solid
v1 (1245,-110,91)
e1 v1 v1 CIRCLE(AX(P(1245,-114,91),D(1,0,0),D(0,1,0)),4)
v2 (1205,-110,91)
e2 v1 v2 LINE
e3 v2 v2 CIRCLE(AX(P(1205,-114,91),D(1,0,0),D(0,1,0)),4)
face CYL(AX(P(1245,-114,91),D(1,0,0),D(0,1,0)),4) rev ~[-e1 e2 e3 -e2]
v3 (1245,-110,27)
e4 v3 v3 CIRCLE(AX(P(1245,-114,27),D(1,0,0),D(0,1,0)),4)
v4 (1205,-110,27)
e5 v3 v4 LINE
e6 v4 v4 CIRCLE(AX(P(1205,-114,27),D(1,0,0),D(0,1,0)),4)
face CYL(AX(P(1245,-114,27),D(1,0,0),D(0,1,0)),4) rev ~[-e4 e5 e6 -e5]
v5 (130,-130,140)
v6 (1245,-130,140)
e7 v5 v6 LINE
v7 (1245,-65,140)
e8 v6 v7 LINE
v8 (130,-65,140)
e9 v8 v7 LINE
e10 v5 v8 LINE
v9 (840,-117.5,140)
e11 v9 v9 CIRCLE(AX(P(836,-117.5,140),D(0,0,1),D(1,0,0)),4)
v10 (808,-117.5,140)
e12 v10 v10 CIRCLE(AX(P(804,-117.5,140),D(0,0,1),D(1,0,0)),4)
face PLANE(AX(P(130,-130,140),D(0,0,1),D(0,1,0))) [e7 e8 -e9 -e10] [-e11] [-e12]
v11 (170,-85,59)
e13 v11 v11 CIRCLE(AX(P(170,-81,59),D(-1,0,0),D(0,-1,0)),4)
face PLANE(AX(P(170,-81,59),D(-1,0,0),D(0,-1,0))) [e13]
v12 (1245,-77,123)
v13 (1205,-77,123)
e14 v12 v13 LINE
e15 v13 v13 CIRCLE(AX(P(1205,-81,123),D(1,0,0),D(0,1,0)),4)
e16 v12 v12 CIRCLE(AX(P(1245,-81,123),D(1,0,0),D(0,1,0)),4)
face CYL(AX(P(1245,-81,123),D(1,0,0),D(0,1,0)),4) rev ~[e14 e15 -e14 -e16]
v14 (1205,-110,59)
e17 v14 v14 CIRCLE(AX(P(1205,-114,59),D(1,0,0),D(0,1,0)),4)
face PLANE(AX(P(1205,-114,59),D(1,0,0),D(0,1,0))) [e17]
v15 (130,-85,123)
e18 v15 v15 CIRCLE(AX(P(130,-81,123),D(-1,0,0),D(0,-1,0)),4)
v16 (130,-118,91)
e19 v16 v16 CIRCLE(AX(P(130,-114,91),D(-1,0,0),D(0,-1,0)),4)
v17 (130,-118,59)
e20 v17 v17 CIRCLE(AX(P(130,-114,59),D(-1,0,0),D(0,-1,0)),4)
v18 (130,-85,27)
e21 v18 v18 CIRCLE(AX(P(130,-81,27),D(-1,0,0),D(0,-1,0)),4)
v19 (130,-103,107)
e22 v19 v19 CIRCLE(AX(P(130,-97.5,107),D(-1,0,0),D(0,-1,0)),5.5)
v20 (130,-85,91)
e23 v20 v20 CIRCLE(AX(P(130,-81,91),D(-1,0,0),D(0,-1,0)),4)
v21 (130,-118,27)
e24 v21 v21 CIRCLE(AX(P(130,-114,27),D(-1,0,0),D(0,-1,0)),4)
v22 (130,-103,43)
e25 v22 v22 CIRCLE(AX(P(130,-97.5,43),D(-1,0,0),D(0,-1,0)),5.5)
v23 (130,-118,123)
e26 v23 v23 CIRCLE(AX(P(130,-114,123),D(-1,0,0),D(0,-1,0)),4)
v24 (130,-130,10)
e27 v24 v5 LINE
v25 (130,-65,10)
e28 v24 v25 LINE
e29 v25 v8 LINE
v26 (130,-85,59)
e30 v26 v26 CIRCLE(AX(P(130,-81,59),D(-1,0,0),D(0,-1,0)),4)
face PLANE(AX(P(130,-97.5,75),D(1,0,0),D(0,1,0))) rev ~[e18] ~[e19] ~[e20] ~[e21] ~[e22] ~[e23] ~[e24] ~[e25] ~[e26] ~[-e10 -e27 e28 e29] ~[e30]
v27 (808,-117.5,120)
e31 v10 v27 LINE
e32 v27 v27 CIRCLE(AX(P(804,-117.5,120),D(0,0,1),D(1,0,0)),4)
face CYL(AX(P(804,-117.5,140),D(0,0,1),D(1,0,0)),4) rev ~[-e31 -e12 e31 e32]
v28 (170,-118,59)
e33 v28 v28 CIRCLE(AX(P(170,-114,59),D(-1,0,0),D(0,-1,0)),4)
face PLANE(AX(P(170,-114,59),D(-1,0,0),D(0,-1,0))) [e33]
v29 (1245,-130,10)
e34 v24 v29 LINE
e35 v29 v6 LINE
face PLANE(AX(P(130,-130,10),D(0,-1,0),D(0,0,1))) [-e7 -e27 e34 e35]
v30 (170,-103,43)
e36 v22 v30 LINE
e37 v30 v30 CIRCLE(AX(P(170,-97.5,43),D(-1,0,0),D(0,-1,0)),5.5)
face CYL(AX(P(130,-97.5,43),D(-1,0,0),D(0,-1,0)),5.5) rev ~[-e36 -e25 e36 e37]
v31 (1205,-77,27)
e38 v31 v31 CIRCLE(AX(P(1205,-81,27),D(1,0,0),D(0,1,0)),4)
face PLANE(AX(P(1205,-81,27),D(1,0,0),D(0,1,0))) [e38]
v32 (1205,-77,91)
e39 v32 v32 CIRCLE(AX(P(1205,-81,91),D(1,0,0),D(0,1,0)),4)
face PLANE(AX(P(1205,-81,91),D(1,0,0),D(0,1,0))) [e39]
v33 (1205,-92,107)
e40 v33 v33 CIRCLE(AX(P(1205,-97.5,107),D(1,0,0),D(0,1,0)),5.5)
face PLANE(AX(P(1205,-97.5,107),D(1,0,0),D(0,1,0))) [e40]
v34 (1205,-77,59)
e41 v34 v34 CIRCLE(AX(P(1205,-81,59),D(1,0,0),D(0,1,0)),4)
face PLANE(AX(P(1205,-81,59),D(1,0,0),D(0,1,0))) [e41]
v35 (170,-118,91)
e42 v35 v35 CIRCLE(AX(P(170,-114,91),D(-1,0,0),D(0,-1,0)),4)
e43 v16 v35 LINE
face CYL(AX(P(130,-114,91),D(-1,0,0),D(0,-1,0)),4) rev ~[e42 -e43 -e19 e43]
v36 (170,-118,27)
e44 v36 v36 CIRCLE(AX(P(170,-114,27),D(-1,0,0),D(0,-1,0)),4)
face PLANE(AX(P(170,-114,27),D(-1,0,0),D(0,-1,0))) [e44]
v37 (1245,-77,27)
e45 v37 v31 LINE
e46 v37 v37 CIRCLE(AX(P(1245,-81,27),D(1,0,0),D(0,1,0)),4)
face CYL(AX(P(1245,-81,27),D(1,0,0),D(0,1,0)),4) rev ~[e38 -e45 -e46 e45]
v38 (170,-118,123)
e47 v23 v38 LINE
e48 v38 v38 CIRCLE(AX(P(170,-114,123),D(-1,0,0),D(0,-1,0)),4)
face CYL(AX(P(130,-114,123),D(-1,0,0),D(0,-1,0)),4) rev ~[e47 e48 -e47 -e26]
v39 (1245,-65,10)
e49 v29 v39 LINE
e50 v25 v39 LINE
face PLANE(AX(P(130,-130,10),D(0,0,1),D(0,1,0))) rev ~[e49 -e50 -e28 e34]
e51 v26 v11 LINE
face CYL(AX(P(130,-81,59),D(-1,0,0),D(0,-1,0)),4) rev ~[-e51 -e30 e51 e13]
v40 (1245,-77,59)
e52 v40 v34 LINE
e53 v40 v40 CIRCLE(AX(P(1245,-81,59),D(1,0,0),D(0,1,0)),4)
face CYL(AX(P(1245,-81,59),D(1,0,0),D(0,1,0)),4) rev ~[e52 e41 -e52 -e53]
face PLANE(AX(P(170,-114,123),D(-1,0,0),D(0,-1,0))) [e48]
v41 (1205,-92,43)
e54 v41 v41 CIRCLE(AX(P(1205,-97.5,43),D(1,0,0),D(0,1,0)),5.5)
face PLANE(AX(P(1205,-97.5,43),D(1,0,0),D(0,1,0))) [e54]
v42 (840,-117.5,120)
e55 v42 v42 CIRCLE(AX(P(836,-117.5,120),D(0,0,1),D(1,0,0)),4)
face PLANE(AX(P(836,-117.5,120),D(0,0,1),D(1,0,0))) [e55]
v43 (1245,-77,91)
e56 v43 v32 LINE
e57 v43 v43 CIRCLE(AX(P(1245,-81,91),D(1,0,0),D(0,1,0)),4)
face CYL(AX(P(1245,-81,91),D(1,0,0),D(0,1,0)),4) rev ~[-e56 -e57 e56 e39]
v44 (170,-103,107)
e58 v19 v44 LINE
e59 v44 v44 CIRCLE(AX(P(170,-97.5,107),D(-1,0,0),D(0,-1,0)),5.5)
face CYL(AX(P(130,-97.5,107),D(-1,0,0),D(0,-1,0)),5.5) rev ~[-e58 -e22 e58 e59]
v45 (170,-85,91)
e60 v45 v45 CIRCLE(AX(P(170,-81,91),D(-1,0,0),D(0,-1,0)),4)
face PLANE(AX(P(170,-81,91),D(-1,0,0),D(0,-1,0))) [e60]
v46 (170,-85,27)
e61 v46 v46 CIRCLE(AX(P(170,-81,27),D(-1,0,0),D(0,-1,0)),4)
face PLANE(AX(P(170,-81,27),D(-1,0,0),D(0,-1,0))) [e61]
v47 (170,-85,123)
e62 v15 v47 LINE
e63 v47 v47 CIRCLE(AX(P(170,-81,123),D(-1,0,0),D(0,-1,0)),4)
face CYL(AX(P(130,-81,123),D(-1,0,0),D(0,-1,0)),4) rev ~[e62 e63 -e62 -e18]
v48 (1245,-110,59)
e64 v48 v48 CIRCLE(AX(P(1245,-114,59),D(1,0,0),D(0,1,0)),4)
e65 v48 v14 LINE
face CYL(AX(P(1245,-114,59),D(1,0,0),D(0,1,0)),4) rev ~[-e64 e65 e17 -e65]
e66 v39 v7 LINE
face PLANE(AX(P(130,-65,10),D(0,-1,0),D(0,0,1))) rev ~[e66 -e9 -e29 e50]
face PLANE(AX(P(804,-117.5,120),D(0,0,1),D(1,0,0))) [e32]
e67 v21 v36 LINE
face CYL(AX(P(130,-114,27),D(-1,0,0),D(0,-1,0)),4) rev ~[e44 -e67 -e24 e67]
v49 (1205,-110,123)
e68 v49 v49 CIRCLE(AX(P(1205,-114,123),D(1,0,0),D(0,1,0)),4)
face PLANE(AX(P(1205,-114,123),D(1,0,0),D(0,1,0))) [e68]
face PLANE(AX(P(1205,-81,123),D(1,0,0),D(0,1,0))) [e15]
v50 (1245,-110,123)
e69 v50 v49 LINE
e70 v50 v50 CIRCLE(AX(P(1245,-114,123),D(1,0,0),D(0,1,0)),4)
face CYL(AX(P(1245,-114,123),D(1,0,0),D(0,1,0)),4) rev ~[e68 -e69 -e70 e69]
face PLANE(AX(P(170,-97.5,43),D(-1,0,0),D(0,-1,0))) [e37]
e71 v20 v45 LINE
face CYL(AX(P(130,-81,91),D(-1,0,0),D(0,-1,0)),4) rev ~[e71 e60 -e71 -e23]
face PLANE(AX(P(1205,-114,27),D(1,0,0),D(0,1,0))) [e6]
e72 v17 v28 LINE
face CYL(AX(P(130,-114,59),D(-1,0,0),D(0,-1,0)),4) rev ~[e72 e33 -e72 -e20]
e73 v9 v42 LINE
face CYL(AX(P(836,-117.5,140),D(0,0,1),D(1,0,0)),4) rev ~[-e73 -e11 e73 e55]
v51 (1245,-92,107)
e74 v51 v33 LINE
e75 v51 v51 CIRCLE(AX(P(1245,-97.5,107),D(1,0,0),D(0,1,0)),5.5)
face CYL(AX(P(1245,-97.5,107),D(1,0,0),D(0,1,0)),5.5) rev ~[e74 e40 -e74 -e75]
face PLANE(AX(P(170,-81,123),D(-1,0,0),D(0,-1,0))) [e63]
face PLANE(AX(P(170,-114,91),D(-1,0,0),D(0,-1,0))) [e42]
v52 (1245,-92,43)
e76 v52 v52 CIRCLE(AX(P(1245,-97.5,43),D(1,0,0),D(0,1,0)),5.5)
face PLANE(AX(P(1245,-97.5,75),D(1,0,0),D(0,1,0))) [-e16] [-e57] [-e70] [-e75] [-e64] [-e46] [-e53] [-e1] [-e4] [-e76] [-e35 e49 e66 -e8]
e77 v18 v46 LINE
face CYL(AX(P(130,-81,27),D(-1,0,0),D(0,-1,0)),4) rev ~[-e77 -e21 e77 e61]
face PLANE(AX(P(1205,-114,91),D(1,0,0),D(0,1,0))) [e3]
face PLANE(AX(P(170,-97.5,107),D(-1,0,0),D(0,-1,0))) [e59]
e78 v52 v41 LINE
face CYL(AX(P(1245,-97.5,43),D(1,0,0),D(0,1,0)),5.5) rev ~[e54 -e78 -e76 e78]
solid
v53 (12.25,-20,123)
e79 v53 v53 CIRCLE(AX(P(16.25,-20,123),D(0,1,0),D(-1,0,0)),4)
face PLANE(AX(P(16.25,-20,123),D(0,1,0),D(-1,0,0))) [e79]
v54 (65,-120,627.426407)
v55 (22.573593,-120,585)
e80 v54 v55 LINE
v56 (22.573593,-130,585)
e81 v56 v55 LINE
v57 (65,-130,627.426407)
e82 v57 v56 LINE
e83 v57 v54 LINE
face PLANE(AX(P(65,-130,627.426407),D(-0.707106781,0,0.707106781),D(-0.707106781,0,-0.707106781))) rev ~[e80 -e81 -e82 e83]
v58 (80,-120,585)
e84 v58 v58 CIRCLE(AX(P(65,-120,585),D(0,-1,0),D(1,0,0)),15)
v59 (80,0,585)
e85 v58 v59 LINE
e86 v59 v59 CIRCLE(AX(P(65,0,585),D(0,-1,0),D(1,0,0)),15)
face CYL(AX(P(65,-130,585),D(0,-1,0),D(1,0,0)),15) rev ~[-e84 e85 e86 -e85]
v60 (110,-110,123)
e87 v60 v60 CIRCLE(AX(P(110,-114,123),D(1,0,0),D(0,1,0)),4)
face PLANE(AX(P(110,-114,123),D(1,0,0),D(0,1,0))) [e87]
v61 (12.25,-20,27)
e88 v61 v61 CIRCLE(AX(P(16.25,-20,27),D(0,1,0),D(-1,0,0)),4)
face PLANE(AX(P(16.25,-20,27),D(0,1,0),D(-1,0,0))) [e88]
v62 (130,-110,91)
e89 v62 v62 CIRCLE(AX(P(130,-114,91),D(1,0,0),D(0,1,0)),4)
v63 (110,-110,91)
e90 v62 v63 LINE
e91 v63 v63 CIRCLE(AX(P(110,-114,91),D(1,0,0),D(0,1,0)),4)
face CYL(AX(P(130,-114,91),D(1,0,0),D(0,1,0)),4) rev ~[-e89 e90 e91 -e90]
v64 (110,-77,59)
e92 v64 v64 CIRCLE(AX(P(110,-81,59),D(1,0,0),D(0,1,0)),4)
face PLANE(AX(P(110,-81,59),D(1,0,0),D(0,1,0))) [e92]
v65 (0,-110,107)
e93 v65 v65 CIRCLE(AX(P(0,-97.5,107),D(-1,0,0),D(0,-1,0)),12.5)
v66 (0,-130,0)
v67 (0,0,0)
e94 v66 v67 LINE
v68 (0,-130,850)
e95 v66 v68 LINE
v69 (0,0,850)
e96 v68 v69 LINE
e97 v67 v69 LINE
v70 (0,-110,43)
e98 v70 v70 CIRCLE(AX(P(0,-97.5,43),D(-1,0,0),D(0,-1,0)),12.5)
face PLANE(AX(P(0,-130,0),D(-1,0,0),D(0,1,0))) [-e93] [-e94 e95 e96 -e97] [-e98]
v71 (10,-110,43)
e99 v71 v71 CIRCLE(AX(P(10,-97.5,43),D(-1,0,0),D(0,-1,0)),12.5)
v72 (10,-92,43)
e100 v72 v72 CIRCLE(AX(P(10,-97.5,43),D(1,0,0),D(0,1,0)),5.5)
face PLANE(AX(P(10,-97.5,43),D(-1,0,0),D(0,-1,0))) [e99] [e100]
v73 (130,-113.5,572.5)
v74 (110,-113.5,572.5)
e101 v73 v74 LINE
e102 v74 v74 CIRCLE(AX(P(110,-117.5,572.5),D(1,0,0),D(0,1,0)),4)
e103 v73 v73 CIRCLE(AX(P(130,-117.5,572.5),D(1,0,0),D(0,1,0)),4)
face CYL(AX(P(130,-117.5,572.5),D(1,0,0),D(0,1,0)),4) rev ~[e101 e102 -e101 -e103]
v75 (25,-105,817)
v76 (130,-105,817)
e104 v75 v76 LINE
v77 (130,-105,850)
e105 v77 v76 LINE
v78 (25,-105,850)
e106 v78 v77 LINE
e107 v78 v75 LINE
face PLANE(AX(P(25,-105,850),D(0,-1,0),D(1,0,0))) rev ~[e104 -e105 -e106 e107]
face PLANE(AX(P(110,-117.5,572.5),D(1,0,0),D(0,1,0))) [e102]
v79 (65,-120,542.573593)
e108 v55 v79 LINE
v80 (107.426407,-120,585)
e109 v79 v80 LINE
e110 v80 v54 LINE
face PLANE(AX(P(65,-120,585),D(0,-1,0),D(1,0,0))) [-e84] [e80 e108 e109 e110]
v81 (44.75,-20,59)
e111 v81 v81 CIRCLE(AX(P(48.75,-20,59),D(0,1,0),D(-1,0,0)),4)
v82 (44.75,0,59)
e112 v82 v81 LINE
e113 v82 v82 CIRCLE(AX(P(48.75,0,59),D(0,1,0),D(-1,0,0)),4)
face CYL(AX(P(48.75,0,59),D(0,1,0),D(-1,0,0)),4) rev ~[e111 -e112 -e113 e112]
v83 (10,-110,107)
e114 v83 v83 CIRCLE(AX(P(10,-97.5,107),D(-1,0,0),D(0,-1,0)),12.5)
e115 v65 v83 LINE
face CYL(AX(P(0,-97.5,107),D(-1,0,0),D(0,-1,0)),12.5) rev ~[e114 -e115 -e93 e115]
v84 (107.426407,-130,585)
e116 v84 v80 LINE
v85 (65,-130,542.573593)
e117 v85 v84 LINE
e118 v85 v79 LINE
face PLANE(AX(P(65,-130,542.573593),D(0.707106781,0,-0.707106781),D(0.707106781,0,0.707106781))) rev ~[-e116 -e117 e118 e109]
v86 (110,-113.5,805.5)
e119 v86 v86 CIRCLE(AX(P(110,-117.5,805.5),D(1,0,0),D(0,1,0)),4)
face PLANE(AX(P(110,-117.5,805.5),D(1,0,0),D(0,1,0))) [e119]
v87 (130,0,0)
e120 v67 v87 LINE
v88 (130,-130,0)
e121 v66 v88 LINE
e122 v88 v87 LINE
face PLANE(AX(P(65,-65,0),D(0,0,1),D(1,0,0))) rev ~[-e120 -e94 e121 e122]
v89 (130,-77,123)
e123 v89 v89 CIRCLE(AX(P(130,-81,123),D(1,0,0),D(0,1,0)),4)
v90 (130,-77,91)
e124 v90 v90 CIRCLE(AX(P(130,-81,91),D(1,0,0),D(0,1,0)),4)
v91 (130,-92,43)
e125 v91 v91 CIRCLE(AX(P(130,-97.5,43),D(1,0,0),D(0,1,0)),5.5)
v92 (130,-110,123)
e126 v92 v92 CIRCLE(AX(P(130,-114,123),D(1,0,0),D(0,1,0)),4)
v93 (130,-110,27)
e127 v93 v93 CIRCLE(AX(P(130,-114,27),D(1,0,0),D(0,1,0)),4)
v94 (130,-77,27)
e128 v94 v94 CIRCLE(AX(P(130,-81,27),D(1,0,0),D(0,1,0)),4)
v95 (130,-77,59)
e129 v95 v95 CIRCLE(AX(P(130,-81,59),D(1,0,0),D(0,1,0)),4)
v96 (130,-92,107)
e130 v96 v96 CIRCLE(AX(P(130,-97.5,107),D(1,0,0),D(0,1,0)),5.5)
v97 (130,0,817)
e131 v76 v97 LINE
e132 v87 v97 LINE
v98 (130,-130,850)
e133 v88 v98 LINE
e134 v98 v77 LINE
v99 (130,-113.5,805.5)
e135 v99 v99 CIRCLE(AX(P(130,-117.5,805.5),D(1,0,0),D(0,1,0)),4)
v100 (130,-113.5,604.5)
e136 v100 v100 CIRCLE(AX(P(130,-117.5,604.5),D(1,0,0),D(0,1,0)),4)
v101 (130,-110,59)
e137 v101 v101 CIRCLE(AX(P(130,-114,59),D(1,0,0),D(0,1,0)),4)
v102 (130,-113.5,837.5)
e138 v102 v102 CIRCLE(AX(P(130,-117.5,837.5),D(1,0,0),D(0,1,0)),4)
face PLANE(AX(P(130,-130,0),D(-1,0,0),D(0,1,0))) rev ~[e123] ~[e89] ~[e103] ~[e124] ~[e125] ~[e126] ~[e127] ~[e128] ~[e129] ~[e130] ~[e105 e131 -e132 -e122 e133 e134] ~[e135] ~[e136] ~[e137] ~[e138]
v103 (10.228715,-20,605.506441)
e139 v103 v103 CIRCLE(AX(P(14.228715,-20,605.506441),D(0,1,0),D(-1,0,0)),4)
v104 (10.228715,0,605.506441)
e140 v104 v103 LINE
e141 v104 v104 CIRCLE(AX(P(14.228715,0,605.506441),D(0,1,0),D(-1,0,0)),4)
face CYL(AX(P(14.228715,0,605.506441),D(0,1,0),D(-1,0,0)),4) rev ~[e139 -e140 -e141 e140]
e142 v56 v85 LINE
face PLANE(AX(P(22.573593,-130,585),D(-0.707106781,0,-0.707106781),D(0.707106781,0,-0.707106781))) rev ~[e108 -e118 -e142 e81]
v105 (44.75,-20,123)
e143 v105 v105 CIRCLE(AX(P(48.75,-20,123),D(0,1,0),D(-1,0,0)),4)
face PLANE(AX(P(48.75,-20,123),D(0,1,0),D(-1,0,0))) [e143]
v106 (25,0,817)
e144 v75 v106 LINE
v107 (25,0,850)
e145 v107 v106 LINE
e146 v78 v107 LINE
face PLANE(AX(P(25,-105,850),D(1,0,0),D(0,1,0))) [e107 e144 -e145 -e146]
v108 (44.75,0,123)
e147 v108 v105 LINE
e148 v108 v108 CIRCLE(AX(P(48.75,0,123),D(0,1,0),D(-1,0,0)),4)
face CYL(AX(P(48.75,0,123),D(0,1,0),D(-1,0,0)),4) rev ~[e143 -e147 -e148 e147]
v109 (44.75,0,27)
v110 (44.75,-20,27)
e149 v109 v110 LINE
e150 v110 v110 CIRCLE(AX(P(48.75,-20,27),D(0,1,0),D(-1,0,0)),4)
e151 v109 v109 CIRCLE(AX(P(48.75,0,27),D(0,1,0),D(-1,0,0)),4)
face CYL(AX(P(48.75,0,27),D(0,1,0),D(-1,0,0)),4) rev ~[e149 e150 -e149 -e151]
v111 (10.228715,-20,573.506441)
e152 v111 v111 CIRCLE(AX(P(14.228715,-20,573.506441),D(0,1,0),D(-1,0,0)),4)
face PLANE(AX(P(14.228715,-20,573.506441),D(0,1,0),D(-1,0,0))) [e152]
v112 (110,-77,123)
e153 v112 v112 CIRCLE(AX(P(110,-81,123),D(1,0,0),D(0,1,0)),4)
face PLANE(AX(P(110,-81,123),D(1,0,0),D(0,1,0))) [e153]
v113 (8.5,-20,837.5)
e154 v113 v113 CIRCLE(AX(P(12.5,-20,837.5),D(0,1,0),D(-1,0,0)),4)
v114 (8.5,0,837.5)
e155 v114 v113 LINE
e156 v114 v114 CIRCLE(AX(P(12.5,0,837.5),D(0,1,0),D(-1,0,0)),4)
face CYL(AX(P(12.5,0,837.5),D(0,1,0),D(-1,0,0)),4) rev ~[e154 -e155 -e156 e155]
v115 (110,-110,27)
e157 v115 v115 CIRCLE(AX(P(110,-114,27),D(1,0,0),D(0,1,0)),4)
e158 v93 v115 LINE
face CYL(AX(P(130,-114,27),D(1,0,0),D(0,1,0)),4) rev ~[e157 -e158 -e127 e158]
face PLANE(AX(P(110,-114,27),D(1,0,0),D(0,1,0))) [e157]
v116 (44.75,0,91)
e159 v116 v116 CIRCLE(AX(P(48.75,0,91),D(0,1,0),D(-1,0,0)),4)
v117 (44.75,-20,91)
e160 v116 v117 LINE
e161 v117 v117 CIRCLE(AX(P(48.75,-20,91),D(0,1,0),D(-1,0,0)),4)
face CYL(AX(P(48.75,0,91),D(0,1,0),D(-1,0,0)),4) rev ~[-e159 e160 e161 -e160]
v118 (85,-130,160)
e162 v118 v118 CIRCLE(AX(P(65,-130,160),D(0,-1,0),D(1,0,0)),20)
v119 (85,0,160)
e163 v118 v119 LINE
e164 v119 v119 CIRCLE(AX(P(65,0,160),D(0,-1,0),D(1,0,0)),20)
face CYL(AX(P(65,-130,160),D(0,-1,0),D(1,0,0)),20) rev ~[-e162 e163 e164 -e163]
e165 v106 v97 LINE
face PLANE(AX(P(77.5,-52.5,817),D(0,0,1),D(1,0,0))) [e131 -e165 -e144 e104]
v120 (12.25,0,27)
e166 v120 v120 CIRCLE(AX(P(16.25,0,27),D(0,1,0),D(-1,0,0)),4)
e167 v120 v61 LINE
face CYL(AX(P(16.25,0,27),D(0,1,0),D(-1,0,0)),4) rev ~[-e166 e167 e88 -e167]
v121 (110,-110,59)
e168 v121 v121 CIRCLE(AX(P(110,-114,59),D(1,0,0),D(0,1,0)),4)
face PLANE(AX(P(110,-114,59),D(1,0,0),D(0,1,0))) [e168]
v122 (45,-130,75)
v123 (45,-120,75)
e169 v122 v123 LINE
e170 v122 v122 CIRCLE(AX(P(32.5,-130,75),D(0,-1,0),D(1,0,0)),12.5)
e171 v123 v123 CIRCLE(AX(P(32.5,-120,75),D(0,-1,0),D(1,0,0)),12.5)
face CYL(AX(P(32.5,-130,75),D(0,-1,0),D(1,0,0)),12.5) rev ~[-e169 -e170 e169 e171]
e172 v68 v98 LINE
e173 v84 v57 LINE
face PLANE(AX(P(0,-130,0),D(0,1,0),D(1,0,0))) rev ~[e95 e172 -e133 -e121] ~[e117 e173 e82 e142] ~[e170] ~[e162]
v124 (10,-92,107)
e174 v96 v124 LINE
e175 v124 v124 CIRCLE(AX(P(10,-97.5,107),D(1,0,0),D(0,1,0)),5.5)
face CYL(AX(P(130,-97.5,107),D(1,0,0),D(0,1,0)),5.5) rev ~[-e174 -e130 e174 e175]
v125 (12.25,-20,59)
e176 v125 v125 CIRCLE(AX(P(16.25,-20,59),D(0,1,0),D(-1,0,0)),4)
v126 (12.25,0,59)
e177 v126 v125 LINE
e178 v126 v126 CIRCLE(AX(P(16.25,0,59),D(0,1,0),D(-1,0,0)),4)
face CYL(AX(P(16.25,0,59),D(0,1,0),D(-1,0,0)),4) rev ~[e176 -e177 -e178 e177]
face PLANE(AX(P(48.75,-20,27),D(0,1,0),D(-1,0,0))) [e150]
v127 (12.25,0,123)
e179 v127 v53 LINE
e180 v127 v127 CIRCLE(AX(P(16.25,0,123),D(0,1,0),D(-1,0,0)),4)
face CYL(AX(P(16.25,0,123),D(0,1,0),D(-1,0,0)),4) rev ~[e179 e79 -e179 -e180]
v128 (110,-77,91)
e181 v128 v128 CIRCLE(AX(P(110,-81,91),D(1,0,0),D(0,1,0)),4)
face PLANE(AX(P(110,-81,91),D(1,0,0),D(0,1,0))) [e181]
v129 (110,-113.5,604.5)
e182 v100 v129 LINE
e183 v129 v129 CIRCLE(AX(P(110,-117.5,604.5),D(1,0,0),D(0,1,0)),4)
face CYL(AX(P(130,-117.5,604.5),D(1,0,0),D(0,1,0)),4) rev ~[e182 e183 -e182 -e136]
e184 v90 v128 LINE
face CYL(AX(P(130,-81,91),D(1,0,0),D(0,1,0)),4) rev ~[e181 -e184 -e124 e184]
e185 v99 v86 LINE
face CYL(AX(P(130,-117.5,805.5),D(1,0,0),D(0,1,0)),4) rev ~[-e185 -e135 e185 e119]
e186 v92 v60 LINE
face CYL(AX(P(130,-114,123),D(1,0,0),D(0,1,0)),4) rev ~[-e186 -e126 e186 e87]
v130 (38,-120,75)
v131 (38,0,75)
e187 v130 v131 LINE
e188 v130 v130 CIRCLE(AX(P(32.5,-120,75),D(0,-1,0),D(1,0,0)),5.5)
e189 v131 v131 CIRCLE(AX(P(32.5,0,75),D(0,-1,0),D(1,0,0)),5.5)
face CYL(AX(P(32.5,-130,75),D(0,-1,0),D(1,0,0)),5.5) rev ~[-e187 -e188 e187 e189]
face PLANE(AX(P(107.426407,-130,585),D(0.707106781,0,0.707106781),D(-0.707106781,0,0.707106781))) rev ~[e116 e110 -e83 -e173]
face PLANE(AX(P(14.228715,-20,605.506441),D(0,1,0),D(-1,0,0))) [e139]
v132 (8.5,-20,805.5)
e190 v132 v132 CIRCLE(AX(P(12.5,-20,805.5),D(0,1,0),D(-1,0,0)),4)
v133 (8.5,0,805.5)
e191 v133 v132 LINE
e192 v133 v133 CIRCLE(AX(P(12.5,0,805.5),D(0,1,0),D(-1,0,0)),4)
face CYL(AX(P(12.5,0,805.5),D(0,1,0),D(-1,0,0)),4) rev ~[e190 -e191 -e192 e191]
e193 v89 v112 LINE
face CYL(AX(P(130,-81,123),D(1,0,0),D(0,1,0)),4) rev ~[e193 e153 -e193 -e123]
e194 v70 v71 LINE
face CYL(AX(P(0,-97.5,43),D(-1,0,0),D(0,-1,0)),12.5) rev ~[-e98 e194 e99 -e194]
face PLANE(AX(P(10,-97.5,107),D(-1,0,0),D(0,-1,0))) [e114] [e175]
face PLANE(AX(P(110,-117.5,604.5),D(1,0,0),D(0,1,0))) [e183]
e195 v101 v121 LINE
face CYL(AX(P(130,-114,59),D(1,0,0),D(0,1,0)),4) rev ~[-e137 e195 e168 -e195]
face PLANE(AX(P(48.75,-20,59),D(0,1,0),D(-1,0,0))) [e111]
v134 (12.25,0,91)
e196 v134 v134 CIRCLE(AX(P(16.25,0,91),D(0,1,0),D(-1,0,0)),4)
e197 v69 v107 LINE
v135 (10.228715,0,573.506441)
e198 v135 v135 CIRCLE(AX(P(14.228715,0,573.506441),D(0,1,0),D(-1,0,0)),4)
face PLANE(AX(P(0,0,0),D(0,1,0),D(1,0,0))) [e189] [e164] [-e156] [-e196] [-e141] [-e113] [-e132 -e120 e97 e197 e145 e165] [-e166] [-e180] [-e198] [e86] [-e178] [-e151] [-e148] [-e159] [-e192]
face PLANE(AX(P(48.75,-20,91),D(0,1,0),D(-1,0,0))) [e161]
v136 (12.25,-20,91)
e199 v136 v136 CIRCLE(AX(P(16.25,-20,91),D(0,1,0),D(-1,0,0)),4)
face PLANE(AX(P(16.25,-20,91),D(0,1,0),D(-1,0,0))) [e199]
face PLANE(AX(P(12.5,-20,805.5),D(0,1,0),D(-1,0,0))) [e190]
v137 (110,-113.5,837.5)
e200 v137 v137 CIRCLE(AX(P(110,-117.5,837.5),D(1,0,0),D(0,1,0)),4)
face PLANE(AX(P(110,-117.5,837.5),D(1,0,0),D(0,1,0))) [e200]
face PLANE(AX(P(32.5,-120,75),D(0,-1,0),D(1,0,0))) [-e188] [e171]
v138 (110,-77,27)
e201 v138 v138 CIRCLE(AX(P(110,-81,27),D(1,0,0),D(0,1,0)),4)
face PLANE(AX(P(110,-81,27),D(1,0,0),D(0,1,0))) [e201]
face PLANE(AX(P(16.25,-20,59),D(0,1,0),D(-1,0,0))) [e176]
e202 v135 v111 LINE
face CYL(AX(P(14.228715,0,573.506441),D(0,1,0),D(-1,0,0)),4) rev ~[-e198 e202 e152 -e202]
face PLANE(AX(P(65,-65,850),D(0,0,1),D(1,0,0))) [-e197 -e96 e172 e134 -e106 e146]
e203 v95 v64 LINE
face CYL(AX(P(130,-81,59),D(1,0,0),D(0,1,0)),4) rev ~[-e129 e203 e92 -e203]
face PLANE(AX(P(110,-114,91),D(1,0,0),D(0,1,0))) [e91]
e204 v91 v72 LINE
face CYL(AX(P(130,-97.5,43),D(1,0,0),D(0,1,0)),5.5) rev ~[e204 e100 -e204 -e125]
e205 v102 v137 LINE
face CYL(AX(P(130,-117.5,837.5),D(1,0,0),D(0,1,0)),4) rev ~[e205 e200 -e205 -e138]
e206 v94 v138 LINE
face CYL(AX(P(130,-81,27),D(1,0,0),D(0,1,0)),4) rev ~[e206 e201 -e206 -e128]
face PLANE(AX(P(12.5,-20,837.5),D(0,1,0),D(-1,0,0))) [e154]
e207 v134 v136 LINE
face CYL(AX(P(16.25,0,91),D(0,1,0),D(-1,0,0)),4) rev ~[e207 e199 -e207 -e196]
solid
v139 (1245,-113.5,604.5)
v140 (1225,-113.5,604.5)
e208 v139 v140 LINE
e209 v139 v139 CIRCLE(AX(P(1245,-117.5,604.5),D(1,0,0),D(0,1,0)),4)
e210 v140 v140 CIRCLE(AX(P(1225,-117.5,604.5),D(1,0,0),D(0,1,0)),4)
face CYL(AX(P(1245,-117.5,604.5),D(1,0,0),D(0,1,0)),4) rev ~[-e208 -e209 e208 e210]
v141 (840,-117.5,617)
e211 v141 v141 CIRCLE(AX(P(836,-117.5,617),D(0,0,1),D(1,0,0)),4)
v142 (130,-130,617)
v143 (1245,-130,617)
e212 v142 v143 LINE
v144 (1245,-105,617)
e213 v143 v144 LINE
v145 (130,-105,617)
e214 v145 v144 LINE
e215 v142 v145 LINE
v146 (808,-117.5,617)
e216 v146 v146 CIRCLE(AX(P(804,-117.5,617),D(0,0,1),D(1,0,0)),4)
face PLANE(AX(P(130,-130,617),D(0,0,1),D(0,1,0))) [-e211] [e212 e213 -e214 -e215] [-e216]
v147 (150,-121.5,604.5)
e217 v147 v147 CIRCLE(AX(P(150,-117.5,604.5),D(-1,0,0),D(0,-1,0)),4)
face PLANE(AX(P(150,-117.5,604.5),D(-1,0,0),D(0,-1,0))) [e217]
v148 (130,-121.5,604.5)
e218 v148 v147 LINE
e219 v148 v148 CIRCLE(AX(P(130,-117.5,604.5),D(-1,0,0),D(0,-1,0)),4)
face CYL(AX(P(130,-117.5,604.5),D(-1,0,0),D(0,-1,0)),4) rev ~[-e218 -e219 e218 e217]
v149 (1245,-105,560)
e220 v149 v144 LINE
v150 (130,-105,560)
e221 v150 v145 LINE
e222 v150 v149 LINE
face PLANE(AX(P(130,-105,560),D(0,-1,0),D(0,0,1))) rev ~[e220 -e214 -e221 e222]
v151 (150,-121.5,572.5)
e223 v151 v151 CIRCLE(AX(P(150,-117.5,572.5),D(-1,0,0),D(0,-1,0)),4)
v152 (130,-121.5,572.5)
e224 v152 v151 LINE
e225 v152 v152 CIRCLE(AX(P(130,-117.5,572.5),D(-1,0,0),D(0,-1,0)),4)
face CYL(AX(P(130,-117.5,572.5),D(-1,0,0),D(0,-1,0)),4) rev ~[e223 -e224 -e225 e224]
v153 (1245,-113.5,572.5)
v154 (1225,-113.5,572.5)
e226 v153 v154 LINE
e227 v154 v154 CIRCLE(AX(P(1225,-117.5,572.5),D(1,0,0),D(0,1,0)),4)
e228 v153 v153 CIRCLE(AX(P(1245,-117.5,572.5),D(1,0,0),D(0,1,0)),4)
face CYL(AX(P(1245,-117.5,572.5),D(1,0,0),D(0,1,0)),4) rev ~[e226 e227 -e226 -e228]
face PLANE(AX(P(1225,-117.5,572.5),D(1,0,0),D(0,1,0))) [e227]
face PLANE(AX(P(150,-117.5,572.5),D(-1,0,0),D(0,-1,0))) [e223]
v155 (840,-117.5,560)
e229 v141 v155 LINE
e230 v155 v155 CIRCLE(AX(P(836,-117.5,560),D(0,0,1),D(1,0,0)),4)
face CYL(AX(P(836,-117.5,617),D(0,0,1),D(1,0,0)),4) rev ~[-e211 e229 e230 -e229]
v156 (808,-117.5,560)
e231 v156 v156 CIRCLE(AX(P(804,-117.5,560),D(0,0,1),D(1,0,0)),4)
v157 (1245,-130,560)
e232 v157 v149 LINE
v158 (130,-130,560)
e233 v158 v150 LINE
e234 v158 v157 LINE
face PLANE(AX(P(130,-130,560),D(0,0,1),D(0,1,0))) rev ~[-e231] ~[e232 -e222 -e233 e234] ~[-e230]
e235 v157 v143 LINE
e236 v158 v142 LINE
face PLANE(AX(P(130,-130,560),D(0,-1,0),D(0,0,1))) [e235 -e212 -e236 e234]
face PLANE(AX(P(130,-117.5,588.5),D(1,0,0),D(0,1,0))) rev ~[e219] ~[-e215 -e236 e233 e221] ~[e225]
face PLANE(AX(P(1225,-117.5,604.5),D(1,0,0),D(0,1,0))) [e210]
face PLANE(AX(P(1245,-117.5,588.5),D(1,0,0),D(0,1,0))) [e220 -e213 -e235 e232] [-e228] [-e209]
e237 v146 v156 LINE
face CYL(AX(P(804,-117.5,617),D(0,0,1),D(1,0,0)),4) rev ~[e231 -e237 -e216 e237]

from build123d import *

# Parameters (mm, degrees)
F0_W      = 130
F0_H      = 130
F1_DEPTH  = 850
F2_R      = 15
F2_R_2    = 20
F2_R_3    = 5.5
F3_DEPTH  = 130.001
F4_R      = 5.5
F5_DEPTH  = 140
F6_W      = 105
F6_H      = 105
F7_DEPTH  = 33
F8_R      = 4
F9_DEPTH  = 20
F10_R     = 4
F11_DEPTH = 20
F12_R     = 12.5
F13_DEPTH = 10
F14_R     = 12.5
F15_DEPTH = 10
F16_W     = 65
F16_H     = 130
F17_DEPTH = 1115
F18_R     = 4
F18_R_2   = 5.5
F19_DEPTH = 40
F20_R     = 4
F20_R_2   = 5.5
F21_DEPTH = 40
F22_R     = 4
F23_DEPTH = 20
F24_W     = 25
F24_H     = 57
F25_DEPTH = 1115
F26_R     = 4
F27_DEPTH = 20
F28_R     = 4
F29_DEPTH = 20
F30_R     = 4
F31_DEPTH = 617.001


with BuildPart() as f1:
    # F0 (on Top) → F1 (new body)
    with BuildSketch(Plane.XY):
        with Locations((65, -65)):
            Rectangle(F0_W, F0_H)
    extrude(amount=F1_DEPTH)

    # F2 (on face) → F3 (cut, through all)
    with BuildSketch(Plane.XZ.offset(130)):
        with Locations((65, 585)):
            Circle(F2_R)
        with Locations((65, 160)):
            Circle(F2_R_2)
        with Locations((32.5, 75)):
            Circle(F2_R_3)
    extrude(amount=-F3_DEPTH, mode=Mode.SUBTRACT)

    # F4 (on face) → F5 (cut)
    with BuildSketch(Plane.YZ.offset(130)):
        with Locations((-97.5, 107)):
            Circle(F4_R)
        with Locations((-97.5, 43)):
            Circle(F4_R)
    extrude(amount=-F5_DEPTH, mode=Mode.SUBTRACT)

    # F6 (on face) → F7 (cut)
    with BuildSketch(Plane.XY.offset(850)):
        with Locations((77.5, -52.5)):
            Rectangle(F6_W, F6_H)
    extrude(amount=-F7_DEPTH, mode=Mode.SUBTRACT)

    # F8 (on face) → F9 (cut)
    with BuildSketch(Plane.YZ.offset(130)):
        with Locations((-114, 123)):
            Circle(F8_R)
        with Locations((-81, 123)):
            Circle(F8_R)
        with Locations((-114, 91)):
            Circle(F8_R)
        with Locations((-81, 91)):
            Circle(F8_R)
        with Locations((-114, 59)):
            Circle(F8_R)
        with Locations((-81, 59)):
            Circle(F8_R)
        with Locations((-114, 27)):
            Circle(F8_R)
        with Locations((-81, 27)):
            Circle(F8_R)
        with Locations((-117.5, 837.5)):
            Circle(F8_R)
        with Locations((-117.5, 805.5)):
            Circle(F8_R)
        with Locations((-117.5, 604.5)):
            Circle(F8_R)
        with Locations((-117.5, 572.5)):
            Circle(F8_R)
    extrude(amount=-F9_DEPTH, mode=Mode.SUBTRACT)

    # F10 (on face) → F11 (cut)
    with BuildSketch(Plane(origin=(0, 0, 0), x_dir=(-1, 0, 0), z_dir=(0, 1, 0))):
        with Locations((-16.25, 123)):
            Circle(F10_R)
        with Locations((-16.25, 91)):
            Circle(F10_R)
        with Locations((-48.75, 123)):
            Circle(F10_R)
        with Locations((-48.75, 91)):
            Circle(F10_R)
        with Locations((-48.75, 27)):
            Circle(F10_R)
        with Locations((-16.25, 27)):
            Circle(F10_R)
        with Locations((-16.25, 59)):
            Circle(F10_R)
        with Locations((-48.75, 59)):
            Circle(F10_R)
        with Locations((-12.5, 837.5)):
            Circle(F10_R)
        with Locations((-12.5, 805.5)):
            Circle(F10_R)
        with Locations((-14.2287150467, 605.5064407267)):
            Circle(F10_R)
        with Locations((-14.2287150467, 573.5064407267)):
            Circle(F10_R)
    extrude(amount=-F11_DEPTH, mode=Mode.SUBTRACT)

    # F12 (on face) → F13 (cut)
    with BuildSketch(Plane.XZ.offset(130)):
        Polygon((22.5735931288, 585), (65, 542.5735931288), (107.4264068712, 585), (65, 627.4264068712), align=None)
        with Locations((32.5, 75)):
            Circle(F12_R)
    extrude(amount=-F13_DEPTH, mode=Mode.SUBTRACT)

    # F14 (on face) → F15 (cut)
    with BuildSketch(Plane(origin=(0, 0, 0), x_dir=(0, -1, 0), z_dir=(-1, 0, 0))):
        with Locations((97.5, 107)):
            Circle(F14_R)
        with Locations((97.5, 43)):
            Circle(F14_R)
    extrude(amount=-F15_DEPTH, mode=Mode.SUBTRACT)


with BuildPart() as f17:
    # F16 (on face) → F17 (new body)
    with BuildSketch(Plane.YZ.offset(130)):
        with Locations((-97.5, 75)):
            Rectangle(F16_W, F16_H)
    extrude(amount=F17_DEPTH)

    # F18 (on face) → F19 (cut)
    with BuildSketch(Plane.YZ.offset(1245)):
        with Locations((-114, 123)):
            Circle(F18_R)
        with Locations((-81, 123)):
            Circle(F18_R)
        with Locations((-81, 91)):
            Circle(F18_R)
        with Locations((-114, 91)):
            Circle(F18_R)
        with Locations((-114, 59)):
            Circle(F18_R)
        with Locations((-81, 59)):
            Circle(F18_R)
        with Locations((-81, 27)):
            Circle(F18_R)
        with Locations((-114, 27)):
            Circle(F18_R)
        with Locations((-97.5, 43)):
            Circle(F18_R_2)
        with Locations((-97.5, 107)):
            Circle(F18_R_2)
    extrude(amount=-F19_DEPTH, mode=Mode.SUBTRACT)

    # F20 (on face) → F21 (cut)
    with BuildSketch(Plane(origin=(130, 0, 0), x_dir=(0, -1, 0), z_dir=(-1, 0, 0))):
        with Locations((81, 123)):
            Circle(F20_R)
        with Locations((97.5, 107)):
            Circle(F20_R_2)
        with Locations((114, 123)):
            Circle(F20_R)
        with Locations((114, 91)):
            Circle(F20_R)
        with Locations((114, 59)):
            Circle(F20_R)
        with Locations((114, 27)):
            Circle(F20_R)
        with Locations((97.5, 43)):
            Circle(F20_R_2)
        with Locations((81, 27)):
            Circle(F20_R)
        with Locations((81, 59)):
            Circle(F20_R)
        with Locations((81, 91)):
            Circle(F20_R)
    extrude(amount=-F21_DEPTH, mode=Mode.SUBTRACT)

    # F22 (on face) → F23 (cut)
    with BuildSketch(Plane.XY.offset(140)):
        with Locations((804, -117.5)):
            Circle(F22_R)
        with Locations((836, -117.5)):
            Circle(F22_R)
    extrude(amount=-F23_DEPTH, mode=Mode.SUBTRACT)


with BuildPart() as f25:
    # F24 (on face) → F25 (new body)
    with BuildSketch(Plane.YZ.offset(130)):
        with Locations((-117.5, 588.5)):
            Rectangle(F24_W, F24_H)
    extrude(amount=F25_DEPTH)

    # F26 (on face) → F27 (cut)
    with BuildSketch(Plane.YZ.offset(1245)):
        with Locations((-117.5, 604.5)):
            Circle(F26_R)
        with Locations((-117.5, 572.5)):
            Circle(F26_R)
    extrude(amount=-F27_DEPTH, mode=Mode.SUBTRACT)

    # F28 (on face) → F29 (cut)
    with BuildSketch(Plane(origin=(130, 0, 0), x_dir=(0, -1, 0), z_dir=(-1, 0, 0))):
        with Locations((117.5, 604.5)):
            Circle(F28_R)
        with Locations((117.5, 572.5)):
            Circle(F28_R)
    extrude(amount=-F29_DEPTH, mode=Mode.SUBTRACT)

    # F30 (on face) → F31 (cut, through all)
    with BuildSketch(Plane.XY.offset(617)):
        with Locations((804, -117.5)):
            Circle(F30_R)
        with Locations((836, -117.5)):
            Circle(F30_R)
    extrude(amount=-F31_DEPTH, mode=Mode.SUBTRACT)


solid = Compound([f1.part, f17.part, f25.part])
